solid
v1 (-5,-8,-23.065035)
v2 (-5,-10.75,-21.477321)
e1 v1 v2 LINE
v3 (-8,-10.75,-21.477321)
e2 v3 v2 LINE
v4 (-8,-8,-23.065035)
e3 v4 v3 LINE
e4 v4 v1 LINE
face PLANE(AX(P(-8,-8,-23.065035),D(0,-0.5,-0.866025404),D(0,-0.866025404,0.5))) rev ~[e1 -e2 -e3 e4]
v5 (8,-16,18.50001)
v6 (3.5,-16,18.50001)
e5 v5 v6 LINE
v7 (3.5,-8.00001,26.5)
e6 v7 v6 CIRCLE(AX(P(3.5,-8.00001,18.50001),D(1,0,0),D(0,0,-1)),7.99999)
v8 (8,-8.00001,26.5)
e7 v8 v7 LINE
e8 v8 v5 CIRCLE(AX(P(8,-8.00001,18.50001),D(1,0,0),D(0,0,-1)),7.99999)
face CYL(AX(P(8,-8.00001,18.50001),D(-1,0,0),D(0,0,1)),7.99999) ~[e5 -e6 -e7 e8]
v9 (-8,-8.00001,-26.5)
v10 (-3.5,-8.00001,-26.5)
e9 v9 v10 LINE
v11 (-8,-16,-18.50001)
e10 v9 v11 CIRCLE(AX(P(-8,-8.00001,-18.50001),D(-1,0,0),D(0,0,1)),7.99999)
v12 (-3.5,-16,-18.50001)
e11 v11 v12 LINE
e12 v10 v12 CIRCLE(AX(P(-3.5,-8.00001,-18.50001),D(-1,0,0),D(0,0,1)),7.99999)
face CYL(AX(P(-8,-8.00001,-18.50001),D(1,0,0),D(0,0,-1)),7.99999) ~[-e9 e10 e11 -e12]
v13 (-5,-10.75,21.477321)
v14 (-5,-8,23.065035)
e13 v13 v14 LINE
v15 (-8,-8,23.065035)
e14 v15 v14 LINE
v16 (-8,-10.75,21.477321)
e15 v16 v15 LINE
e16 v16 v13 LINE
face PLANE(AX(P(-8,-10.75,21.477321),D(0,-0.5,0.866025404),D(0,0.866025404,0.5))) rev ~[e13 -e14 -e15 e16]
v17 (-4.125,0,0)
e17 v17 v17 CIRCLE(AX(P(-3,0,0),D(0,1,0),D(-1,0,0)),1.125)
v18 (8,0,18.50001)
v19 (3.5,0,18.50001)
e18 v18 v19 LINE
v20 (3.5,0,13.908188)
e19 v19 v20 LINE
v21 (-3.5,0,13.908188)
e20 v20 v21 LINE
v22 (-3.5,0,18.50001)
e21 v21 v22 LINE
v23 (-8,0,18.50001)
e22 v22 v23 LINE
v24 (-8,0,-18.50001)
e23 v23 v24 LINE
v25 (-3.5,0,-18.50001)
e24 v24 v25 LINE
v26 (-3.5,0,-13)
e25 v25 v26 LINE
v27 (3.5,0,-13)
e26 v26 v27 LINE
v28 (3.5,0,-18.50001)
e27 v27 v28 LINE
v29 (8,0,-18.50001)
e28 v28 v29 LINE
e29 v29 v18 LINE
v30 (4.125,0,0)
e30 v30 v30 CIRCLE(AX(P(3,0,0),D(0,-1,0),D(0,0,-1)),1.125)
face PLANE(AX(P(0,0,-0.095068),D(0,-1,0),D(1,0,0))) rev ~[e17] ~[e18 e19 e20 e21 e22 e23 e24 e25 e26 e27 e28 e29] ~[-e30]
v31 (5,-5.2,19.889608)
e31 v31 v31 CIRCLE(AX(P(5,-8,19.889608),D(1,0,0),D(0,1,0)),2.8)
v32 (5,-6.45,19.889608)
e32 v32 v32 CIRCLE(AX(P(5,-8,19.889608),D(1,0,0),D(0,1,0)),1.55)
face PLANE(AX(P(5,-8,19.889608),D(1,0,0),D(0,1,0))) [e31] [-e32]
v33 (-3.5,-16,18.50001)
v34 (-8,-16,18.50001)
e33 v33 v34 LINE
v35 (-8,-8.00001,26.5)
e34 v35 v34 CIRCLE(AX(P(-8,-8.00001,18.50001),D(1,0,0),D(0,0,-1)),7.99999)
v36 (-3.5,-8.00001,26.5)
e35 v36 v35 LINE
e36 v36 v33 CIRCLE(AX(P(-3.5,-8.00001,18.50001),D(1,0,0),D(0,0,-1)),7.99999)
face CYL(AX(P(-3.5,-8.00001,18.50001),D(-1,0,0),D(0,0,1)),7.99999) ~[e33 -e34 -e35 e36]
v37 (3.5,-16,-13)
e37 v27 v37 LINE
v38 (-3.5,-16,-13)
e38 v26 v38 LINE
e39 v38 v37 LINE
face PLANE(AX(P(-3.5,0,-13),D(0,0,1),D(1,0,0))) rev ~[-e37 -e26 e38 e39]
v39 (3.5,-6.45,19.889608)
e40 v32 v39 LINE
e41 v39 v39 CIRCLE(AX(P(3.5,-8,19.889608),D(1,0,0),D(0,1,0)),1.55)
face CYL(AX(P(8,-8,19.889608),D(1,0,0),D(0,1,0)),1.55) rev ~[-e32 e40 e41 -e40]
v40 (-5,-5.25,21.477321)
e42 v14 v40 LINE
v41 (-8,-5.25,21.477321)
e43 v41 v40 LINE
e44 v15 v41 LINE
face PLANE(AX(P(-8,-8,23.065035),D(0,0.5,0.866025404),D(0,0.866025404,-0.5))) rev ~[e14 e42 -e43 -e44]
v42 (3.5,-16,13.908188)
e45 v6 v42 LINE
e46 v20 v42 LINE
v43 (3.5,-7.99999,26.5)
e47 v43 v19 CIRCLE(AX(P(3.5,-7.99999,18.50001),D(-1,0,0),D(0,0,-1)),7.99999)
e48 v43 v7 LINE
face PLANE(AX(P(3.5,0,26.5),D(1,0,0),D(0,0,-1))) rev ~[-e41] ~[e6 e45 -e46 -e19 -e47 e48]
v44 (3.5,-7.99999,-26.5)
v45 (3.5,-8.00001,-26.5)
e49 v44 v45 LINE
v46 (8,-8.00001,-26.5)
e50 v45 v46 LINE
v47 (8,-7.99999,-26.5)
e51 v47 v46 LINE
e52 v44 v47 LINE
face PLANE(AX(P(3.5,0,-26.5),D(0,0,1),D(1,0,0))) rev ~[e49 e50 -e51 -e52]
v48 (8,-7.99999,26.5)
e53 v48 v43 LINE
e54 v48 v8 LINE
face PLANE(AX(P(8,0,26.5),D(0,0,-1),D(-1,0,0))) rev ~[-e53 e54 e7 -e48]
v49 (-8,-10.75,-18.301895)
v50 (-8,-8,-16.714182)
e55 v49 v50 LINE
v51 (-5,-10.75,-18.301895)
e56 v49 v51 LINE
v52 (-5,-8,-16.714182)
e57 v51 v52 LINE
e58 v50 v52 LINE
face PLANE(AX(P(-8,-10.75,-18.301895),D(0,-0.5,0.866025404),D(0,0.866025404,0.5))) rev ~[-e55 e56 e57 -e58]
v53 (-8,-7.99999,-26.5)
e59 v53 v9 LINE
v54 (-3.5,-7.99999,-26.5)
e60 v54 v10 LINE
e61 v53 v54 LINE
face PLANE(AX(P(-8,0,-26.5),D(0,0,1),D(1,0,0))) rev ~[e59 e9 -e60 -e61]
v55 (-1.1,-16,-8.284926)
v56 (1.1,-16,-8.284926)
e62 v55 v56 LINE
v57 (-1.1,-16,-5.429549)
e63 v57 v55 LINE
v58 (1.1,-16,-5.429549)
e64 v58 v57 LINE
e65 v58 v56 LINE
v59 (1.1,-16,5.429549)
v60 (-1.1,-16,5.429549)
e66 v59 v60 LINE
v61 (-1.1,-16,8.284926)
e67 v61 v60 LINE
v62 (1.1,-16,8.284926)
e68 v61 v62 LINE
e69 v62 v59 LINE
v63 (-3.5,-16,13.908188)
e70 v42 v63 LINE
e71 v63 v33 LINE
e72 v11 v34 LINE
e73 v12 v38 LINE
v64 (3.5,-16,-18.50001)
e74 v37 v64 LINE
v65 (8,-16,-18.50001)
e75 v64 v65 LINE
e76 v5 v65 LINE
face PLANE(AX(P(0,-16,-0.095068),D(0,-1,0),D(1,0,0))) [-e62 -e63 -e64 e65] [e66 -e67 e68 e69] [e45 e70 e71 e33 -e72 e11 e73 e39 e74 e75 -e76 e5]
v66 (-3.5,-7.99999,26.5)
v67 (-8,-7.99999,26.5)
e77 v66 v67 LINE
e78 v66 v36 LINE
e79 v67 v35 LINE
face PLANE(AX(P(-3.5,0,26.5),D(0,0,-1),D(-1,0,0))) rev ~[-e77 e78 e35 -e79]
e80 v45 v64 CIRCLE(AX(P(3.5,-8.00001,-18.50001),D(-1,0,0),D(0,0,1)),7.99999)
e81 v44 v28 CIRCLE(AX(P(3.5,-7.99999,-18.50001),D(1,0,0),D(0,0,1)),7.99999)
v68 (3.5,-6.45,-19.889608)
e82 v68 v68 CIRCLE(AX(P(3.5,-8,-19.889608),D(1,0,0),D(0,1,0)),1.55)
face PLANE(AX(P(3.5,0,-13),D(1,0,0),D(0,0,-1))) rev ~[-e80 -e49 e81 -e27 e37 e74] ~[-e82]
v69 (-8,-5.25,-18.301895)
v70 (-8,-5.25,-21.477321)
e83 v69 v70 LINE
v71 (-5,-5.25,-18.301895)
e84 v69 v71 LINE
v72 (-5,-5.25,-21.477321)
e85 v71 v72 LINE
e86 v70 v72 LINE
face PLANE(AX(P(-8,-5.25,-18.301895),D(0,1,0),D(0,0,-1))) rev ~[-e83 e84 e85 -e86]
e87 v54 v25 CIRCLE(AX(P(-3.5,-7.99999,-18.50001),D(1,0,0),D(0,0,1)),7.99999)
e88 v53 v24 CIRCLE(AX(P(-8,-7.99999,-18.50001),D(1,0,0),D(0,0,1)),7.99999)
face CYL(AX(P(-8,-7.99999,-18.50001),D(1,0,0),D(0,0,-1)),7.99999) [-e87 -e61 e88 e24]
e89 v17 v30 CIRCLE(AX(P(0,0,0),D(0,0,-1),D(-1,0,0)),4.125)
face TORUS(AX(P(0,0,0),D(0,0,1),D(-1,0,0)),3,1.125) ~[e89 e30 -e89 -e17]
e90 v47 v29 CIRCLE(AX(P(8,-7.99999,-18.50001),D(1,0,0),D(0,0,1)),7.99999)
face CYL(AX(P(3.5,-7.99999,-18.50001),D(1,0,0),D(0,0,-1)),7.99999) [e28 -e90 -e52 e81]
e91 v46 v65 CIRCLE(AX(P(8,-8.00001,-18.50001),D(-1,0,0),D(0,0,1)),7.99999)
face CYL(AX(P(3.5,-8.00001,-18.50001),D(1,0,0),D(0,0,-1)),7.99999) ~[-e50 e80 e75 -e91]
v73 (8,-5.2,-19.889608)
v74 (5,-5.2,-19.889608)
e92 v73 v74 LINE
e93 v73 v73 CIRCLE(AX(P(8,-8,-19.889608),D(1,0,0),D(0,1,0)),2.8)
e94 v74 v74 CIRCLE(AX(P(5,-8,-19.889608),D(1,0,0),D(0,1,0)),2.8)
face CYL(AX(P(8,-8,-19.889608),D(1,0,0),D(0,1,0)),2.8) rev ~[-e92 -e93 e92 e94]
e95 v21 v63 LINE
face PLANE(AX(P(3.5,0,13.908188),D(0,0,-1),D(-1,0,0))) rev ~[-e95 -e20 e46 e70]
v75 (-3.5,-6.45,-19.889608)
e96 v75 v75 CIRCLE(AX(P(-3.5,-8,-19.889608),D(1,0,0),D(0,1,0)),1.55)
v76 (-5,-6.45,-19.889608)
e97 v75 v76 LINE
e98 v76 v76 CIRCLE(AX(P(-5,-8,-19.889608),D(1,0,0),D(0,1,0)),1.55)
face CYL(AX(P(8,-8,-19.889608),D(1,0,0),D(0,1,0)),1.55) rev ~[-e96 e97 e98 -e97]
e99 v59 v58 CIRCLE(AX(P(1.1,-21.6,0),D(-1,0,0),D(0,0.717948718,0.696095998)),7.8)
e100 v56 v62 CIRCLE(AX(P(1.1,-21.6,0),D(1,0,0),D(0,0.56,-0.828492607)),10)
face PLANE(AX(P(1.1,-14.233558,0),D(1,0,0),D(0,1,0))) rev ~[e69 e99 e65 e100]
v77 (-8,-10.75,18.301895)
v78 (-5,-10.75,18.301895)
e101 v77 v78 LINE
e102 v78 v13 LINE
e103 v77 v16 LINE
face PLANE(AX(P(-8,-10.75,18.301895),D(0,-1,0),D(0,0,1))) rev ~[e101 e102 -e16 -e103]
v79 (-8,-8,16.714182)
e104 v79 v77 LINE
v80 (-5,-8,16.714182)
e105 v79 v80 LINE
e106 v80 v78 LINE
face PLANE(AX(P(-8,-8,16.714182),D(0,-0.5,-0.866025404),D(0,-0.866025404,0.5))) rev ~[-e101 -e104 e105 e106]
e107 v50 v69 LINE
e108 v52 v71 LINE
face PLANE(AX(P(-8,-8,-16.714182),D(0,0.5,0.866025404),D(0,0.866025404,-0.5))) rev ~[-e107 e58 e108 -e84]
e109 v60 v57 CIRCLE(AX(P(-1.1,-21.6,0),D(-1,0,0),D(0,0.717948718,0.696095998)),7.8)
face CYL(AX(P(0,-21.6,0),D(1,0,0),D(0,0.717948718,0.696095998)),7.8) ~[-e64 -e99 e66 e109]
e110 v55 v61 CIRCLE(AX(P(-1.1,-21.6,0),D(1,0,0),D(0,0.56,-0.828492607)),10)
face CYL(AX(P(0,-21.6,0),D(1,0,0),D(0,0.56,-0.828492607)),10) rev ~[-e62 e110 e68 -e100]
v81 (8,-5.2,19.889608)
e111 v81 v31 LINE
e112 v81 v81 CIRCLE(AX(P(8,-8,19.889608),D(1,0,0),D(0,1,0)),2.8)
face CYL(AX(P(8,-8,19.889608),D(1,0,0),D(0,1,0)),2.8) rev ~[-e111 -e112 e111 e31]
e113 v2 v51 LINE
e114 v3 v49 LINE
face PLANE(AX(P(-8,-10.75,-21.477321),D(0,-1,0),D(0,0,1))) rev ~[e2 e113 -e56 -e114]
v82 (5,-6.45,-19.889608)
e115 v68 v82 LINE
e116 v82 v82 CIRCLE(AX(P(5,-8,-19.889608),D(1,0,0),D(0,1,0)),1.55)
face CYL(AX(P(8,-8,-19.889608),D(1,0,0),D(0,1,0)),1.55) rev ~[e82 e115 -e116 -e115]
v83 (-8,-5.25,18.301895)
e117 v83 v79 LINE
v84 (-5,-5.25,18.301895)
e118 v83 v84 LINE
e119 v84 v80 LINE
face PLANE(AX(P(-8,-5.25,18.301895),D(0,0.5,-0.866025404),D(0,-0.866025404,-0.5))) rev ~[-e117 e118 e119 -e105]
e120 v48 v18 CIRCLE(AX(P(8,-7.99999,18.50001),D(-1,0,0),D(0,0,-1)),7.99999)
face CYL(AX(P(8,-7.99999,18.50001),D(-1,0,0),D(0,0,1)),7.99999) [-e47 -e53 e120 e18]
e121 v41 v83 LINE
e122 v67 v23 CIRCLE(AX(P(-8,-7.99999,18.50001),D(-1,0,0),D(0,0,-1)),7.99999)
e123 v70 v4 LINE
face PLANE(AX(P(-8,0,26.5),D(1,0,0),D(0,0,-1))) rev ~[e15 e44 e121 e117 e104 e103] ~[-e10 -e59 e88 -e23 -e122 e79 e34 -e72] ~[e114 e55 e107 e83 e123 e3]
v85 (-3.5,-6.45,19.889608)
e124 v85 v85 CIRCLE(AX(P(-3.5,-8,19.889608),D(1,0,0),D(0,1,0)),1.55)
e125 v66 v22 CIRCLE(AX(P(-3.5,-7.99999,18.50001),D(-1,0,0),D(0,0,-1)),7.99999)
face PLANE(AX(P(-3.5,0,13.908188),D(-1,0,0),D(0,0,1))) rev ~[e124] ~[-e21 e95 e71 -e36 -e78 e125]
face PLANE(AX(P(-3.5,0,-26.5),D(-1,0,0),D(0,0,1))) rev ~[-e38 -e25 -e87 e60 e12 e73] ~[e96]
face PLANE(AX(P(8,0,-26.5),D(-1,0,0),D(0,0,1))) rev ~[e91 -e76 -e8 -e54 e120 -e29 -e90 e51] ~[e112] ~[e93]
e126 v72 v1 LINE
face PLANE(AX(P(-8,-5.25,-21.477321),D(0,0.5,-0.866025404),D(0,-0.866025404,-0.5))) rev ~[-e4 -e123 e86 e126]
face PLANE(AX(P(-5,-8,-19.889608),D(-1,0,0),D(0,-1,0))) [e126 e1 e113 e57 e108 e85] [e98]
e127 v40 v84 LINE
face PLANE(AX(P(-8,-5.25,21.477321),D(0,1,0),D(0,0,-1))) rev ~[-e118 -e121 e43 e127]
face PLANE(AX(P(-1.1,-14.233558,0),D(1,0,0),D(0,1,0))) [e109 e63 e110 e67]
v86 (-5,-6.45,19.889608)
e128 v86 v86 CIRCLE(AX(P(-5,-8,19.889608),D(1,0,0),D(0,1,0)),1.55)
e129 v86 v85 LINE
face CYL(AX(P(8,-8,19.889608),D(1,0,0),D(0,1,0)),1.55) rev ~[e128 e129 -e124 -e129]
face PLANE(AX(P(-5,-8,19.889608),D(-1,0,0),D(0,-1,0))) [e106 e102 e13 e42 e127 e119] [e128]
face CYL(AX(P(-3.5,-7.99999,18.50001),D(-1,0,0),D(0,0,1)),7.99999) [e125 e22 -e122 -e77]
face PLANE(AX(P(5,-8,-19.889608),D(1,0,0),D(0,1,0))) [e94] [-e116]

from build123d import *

# Parameters (mm, degrees)
F1_DEPTH  = 16
F2_R      = 7.99999
F3_R      = 1.55
F4_DEPTH  = 12.5
F5_DEPTH  = 25
F6_R      = 2.8
F7_DEPTH  = 3
F9_DEPTH  = 3
F10_R     = 1.125
F12_R     = 1.125
F15_DEPTH = 12.5
F17_DEPTH = 1.1


# Not quite as in the source:
# - a fillet or chamfer is up to 0.001 mm smaller than in the source, because OpenCascade refuses the exact size


with BuildPart() as f1:
    # F0 (on Front) → F1 (new body)
    with BuildSketch(Plane.XZ):
        Polygon((8, -18), (8, 18), (8, 26.5), (3.5, 26.5), (3.5, 13.9081878588), (-3.5, 13.9081878588), (-3.5, 26.5), (-8, 26.5), (-8, 18), (-8, -18), (-8, -26.5), (-3.5, -26.5), (-3.5, -18), (-3.5, -13), (3.5, -13), (3.5, -18), (3.5, -26.5), (8, -26.5), align=None)
    extrude(amount=F1_DEPTH)

    # F2 (radius 8 in the source; OpenCascade refuses exactly that, so slightly less here)
    f2_edges = [f1.edges().sort_by_distance(p)[0] for p in [
        (5.75, -16, 26.5),
        (-5.75, -16, 26.5),
        (-5.75, 0, 26.5),
        (5.75, 0, 26.5),
        (5.75, -16, -26.5),
        (-5.75, -16, -26.5),
        (5.75, 0, -26.5),
        (-5.75, 0, -26.5),
    ]]
    fillet(f2_edges, radius=F2_R)

    # F3 (on face) → F4 (cut, symmetric)
    with BuildSketch(Plane.YZ.offset(8)):
        with Locations((-8, 19.8896080256)):
            Circle(F3_R)
        with Locations((-8, -19.8896080256)):
            Circle(F3_R)
    extrude(amount=F4_DEPTH, both=True, mode=Mode.SUBTRACT)

    # F3 (on face) → F5 (cut)
    with BuildSketch(Plane.YZ.offset(8)):
        with Locations((-8, 19.8896080256)):
            Circle(F3_R)
        with Locations((-8, -19.8896080256)):
            Circle(F3_R)
    extrude(amount=-F5_DEPTH, mode=Mode.SUBTRACT)

    # F6 (on face) → F7 (cut)
    with BuildSketch(Plane.YZ.offset(8)):
        with Locations((-8, 19.8896080256)):
            Circle(F6_R)
        with Locations((-8, -19.8896080256)):
            Circle(F6_R)
    extrude(amount=-F7_DEPTH, mode=Mode.SUBTRACT)

    # F8 (on face) → F9 (cut)
    with BuildSketch(Plane(origin=(-8, 0, 0), x_dir=(0, -1, 0), z_dir=(-1, 0, 0))):
        Polygon((10.75, 18.3018947853), (10.75, 21.4773212658), (8, 23.0650345061), (5.25, 21.4773212658), (5.25, 18.3018947853), (8, 16.714181545), align=None)
        Polygon((5.25, -18.3018947853), (5.25, -21.4773212658), (8, -23.0650345061), (10.75, -21.4773212658), (10.75, -18.3018947853), (8, -16.714181545), align=None)
    extrude(amount=-F9_DEPTH, mode=Mode.SUBTRACT)

    # F10 (on face) → F11 (revolve)
    with BuildSketch(Plane.XZ.offset(16)):
        with Locations((-3, 0)):
            Circle(F10_R)
    revolve(axis=Axis((0, -16, 0.0619328348), (0, 0, -1)))

    # F12 (on face) → F13 (revolve)
    with BuildSketch(Plane(origin=(0, 0, 0), x_dir=(-1, 0, 0), z_dir=(0, 1, 0))):
        with Locations((3, 0)):
            Circle(F12_R)
    revolve(axis=Axis((0, 0, 0.5132202059), (0, 0, -1)))

    # F14 (on Top) → F15 (cut, symmetric)
    with BuildSketch(Plane.XY):
        Polygon((1.875, -16), (-1.875, -16), (-4.125, -16), (-8, -16), (-8, -21.5492993593), (8, -21.5492993593), (8, -16), (4.125, -16), align=None)
    extrude(amount=F15_DEPTH, both=True, mode=Mode.SUBTRACT)

    # F16 (on Right) → F17 (cut, symmetric)
    with BuildSketch(Plane.YZ):
        with BuildLine():
            Line((-16, -5.4295487842), (-16, -8.2849260709))
            ThreePointArc((-16, -8.2849260709), (-11.6, 0), (-16, 8.2849260709))
            Line((-16, 8.2849260709), (-16, 5.4295487842))
            ThreePointArc((-16, 5.4295487842), (-13.8, 0), (-16, -5.4295487842))
        make_face()
    extrude(amount=F17_DEPTH, both=True, mode=Mode.SUBTRACT)


solid = f1.part
